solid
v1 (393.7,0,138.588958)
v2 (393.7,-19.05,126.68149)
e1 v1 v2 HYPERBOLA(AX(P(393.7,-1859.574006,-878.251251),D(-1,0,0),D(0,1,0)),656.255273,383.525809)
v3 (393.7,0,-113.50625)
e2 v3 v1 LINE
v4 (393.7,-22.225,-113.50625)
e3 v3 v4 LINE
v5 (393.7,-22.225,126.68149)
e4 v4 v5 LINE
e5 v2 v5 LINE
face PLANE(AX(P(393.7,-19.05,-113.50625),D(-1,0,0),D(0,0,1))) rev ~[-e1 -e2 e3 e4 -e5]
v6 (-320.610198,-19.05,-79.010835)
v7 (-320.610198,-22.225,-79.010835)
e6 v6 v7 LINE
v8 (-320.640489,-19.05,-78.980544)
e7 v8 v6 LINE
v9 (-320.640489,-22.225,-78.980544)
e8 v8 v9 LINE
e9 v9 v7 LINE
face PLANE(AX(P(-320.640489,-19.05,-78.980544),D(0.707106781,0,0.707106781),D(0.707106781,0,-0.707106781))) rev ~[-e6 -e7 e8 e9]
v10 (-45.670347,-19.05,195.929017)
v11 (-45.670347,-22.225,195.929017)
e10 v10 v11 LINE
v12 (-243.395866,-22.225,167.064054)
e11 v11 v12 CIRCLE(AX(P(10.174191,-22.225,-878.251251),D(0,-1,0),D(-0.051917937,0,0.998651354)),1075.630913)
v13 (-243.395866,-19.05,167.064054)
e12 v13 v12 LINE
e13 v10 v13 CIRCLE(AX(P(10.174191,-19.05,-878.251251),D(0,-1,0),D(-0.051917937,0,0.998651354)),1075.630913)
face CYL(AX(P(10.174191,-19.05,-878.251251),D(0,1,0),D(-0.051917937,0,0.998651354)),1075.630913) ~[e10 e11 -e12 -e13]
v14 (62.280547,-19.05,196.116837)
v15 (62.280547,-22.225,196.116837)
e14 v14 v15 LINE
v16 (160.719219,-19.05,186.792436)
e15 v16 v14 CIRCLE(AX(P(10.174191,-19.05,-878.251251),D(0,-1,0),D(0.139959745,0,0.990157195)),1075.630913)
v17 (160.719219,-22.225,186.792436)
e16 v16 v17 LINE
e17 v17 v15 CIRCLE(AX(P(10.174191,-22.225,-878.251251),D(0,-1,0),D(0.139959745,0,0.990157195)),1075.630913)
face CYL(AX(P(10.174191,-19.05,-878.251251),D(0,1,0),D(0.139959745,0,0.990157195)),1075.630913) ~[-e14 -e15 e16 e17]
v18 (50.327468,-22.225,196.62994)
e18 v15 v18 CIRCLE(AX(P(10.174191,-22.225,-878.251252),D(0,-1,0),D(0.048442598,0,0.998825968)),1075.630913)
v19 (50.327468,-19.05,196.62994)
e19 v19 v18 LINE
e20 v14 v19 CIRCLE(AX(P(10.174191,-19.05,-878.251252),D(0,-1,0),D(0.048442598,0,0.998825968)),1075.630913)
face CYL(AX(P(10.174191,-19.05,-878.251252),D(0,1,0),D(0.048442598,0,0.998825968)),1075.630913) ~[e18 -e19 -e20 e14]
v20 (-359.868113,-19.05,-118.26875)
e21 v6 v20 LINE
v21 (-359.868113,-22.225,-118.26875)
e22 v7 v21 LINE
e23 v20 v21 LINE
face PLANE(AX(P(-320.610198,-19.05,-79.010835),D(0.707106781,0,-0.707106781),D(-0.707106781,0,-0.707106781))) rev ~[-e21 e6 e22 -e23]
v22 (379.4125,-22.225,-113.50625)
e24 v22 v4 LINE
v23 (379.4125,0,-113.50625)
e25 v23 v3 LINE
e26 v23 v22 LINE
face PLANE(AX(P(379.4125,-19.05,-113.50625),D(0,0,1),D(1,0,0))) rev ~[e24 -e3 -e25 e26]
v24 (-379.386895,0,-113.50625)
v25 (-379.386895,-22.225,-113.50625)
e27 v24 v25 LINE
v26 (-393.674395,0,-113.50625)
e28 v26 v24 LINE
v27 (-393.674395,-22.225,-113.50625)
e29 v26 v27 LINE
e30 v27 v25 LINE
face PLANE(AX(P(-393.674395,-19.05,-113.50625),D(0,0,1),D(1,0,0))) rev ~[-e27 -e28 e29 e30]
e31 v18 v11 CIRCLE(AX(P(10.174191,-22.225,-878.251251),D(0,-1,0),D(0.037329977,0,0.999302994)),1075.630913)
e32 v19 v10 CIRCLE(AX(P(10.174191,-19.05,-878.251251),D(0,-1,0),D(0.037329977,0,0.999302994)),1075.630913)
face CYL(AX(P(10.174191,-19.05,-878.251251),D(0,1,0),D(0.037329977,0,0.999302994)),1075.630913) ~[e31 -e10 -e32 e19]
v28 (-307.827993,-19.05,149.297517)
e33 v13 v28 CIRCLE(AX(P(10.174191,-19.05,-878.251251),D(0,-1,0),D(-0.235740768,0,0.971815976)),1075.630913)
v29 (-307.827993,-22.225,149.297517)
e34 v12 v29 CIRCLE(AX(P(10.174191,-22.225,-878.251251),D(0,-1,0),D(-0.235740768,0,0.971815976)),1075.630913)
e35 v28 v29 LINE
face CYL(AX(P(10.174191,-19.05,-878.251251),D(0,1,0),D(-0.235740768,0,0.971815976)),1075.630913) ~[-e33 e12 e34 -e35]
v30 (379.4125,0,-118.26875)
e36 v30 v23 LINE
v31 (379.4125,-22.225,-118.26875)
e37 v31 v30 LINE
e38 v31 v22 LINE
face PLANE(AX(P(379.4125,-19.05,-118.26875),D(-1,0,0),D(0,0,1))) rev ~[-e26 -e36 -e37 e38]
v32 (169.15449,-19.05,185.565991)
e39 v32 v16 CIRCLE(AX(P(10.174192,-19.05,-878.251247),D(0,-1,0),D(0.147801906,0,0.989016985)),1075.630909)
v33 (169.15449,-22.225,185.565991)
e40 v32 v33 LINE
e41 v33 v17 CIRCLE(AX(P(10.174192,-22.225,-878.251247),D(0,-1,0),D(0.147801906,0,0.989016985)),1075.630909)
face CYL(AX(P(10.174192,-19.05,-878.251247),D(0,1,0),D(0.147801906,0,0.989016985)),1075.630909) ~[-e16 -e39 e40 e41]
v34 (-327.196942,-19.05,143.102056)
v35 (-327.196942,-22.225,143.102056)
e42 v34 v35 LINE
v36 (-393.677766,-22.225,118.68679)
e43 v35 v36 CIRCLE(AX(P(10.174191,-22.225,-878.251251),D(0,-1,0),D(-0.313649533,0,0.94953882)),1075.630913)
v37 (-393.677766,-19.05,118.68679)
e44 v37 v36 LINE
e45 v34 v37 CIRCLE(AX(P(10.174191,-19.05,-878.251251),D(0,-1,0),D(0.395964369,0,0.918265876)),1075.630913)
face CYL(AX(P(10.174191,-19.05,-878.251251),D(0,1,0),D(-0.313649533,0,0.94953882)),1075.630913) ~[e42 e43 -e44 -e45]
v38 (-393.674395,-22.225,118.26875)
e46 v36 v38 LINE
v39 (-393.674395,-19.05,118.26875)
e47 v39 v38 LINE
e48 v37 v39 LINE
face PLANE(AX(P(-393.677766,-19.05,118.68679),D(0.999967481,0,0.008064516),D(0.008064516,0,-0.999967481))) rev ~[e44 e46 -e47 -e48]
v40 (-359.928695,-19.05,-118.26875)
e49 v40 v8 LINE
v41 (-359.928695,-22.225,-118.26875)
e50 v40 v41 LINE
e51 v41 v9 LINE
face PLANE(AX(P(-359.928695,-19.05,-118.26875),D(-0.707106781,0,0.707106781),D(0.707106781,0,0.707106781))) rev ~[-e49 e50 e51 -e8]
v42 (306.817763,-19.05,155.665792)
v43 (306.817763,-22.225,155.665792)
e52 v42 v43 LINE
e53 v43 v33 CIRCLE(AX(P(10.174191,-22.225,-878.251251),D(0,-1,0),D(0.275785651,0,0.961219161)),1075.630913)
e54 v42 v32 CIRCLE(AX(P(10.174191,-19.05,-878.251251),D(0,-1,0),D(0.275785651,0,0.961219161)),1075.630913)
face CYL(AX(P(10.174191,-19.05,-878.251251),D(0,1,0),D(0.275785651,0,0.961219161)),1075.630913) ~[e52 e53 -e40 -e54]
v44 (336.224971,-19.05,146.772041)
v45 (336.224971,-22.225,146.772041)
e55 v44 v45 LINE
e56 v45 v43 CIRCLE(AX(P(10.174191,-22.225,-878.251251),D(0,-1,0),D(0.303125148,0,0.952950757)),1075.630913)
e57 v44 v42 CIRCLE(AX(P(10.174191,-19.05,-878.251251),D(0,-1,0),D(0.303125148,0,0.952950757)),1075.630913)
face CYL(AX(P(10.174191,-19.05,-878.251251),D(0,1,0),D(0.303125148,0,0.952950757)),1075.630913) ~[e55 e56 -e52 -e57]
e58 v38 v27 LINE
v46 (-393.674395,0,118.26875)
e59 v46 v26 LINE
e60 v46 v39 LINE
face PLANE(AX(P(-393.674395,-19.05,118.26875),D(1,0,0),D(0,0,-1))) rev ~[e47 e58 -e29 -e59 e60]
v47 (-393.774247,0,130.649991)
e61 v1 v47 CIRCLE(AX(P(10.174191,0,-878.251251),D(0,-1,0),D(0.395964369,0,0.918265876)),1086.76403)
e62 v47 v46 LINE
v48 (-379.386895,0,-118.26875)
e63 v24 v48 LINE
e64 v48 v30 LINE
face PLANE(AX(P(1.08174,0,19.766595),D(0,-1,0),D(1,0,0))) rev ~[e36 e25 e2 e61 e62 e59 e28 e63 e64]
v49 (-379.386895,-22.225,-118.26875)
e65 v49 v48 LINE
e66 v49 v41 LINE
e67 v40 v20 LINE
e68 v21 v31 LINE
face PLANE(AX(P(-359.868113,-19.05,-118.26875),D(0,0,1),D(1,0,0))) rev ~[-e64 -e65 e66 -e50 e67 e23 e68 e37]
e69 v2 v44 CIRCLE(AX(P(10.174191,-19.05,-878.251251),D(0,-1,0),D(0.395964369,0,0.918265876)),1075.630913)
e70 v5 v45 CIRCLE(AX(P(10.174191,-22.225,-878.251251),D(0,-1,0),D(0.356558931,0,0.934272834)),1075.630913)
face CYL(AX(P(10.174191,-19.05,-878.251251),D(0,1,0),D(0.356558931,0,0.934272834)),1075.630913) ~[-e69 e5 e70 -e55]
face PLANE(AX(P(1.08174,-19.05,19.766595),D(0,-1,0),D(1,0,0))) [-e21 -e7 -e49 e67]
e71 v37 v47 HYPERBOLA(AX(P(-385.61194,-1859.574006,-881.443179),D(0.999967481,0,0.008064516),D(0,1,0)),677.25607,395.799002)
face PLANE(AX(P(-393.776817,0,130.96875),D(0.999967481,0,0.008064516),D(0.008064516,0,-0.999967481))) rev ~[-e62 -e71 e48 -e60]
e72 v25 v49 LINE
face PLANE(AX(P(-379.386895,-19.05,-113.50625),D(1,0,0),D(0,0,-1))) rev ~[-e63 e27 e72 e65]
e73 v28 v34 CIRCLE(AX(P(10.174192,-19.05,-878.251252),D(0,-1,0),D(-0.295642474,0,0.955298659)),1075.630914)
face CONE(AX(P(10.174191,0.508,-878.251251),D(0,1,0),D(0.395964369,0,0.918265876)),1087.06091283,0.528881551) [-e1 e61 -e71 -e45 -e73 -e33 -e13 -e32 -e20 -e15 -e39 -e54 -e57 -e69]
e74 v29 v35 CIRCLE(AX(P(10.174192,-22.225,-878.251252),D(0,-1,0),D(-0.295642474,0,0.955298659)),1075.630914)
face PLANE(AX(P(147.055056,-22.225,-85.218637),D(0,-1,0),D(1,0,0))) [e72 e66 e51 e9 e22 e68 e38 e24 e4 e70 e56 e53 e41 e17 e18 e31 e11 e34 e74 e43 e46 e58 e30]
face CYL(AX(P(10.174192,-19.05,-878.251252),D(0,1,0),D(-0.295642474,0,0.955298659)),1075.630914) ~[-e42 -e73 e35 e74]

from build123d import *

# Parameters (mm, degrees)
F1_DEPTH    = 19.05
F2_T2_ANGLE = 47.80727079
F4_DEPTH    = 3.175


# Not quite as in the source:
# - a fillet or chamfer that OpenCascade refuses, or shapes differently, is made with other operations: its cross-section is extruded or revolved along the edge and cut away or added


with BuildPart() as f1:
    # F0 (on Front) → F1 (new body)
    with BuildSketch(Plane.XZ):
        with BuildLine():
            Line((-379.386894745, -118.26875), (379.4125, -118.26875))
            Line((379.4125, -118.26875), (379.4125, -113.50625))
            Line((379.4125, -113.50625), (393.7, -113.50625))
            Line((393.7, -113.50625), (393.7, 124.61875))
            ThreePointArc((393.7, 124.61875), (-0.5889314831, 196.0563533265), (-393.674394745, 118.26875))
            Line((-393.674394745, 118.26875), (-393.674394745, -113.50625))
            Line((-393.674394745, -113.50625), (-379.386894745, -113.50625))
            Line((-379.386894745, -113.50625), (-379.386894745, -118.26875))
        make_face()
        with BuildLine():
            ThreePointArc((-393.674394745, 118.26875), (-0.5889314831, 196.0563533265), (393.7, 124.61875))
            Line((393.7, 124.61875), (393.7, 138.90625))
            ThreePointArc((393.7, 138.90625), (-0.7824585401, 208.7544433839), (-393.7768174305, 130.96875))
            Line((-393.7768174305, 130.96875), (-393.674394745, 118.26875))
        make_face()
    extrude(amount=F1_DEPTH)

    # F2: chamfer of 19.558 x 11.43 on 1 edges, made by hand

    # F2_s1 → F2_t2 (revolve, cut)
    with BuildSketch(Plane(origin=(327.911656241, 0, -141.3984070605), x_dir=(0, 1, 0), z_dir=(0.9182658757, 0, -0.3959643691))):
        Polygon((0.508, 284.621375818), (-19.05, 273.191375818), (-19.05, 284.621375818), align=None)
    revolve(axis=Axis((10.1741912427, -19.05, -878.2512511865), (0, -1, 0)), revolution_arc=F2_T2_ANGLE, mode=Mode.SUBTRACT)

    # F3 (on face) → F4 (join)
    with BuildSketch(Plane.XZ.offset(19.05)):
        Polygon((71.1841804533, -118.26875), (178.9472539061, -118.26875), (218.205169263, -79.0108346431), (164.3236325366, -25.1292979167), (110.4420958102, -79.0108346431), align=None)
        Polygon((218.205169263, -79.0108346431), (178.9472539061, -118.26875), (257.4630846199, -118.26875), align=None)
        Polygon((393.7, -113.50625), (393.7, -38.9795184745), (379.8497794422, -25.1292979167), (325.9682427158, -79.0108346431), (286.710327359, -118.26875), (379.4125, -118.26875), (379.4125, -113.50625), align=None)
        Polygon((379.8497794422, -25.1292979167), (393.7, -38.9795184745), (393.7, -11.279077359), align=None)
        Polygon((218.205169263, -79.0108346431), (257.4630846199, -118.26875), (286.710327359, -118.26875), (325.9682427158, -79.0108346431), (272.0867059894, -25.1292979167), (218.205169263, 28.7522388097), (164.3236325366, -25.1292979167), align=None)
        Polygon((41.9369377142, -118.26875), (71.1841804533, -118.26875), (110.4420958102, -79.0108346431), (56.5605590837, -25.1292979167), (2.6790223573, 28.7522388097), (-51.2025143691, -25.1292979167), (2.6790223573, -79.0108346431), align=None)
        Polygon((-36.5788929995, -118.26875), (41.9369377142, -118.26875), (2.6790223573, -79.0108346431), align=None)
        Polygon((-144.3419664524, -118.26875), (-36.5788929995, -118.26875), (2.6790223573, -79.0108346431), (-51.2025143691, -25.1292979167), (-105.0840510955, -79.0108346431), align=None)
        Polygon((325.9682427158, -79.0108346431), (379.8497794422, -25.1292979167), (393.7, -11.279077359), (393.7, 68.7835549784), (379.8497794422, 82.6337755361), (325.9682427158, 28.7522388097), (272.0867059894, -25.1292979167), align=None)
        Polygon((110.4420958102, -79.0108346431), (164.3236325366, -25.1292979167), (218.205169263, 28.7522388097), (164.3236325366, 82.6337755361), (110.4420958102, 28.7522388097), (56.5605590837, -25.1292979167), align=None)
        Polygon((-173.5892091915, -118.26875), (-144.3419664524, -118.26875), (-105.0840510955, -79.0108346431), (-158.9655878219, -25.1292979167), (-212.8471245483, 28.7522388097), (-266.7286612747, -25.1292979167), (-212.8471245483, -79.0108346431), align=None)
        Polygon((379.8497794422, 82.6337755361), (393.7, 68.7835549784), (393.7, 96.4839960939), align=None)
        Polygon((218.205169263, 28.7522388097), (272.0867059894, -25.1292979167), (325.9682427158, 28.7522388097), (272.0867059894, 82.6337755361), (218.205169263, 136.5153122625), (164.3236325366, 82.6337755361), align=None)
        Polygon((2.6790223573, 28.7522388097), (56.5605590837, -25.1292979167), (110.4420958102, 28.7522388097), (56.5605590837, 82.6337755361), (2.6790223573, 136.5153122625), (-51.2025143691, 82.6337755361), align=None)
        Polygon((-105.0840510955, -79.0108346431), (-51.2025143691, -25.1292979167), (2.6790223573, 28.7522388097), (-51.2025143691, 82.6337755361), (-105.0840510955, 28.7522388097), (-158.9655878219, -25.1292979167), align=None)
        Polygon((-252.1050399052, -118.26875), (-173.5892091915, -118.26875), (-212.8471245483, -79.0108346431), align=None)
        Polygon((-359.868113358, -118.26875), (-252.1050399052, -118.26875), (-212.8471245483, -79.0108346431), (-266.7286612747, -25.1292979167), (-320.6101980012, -79.0108346431), align=None)
        with BuildLine():
            Line((325.9682427158, 28.7522388097), (379.8497794422, 82.6337755361))
            Line((379.8497794422, 82.6337755361), (393.7, 96.4839960939))
            Line((393.7, 96.4839960939), (393.7, 126.6814901711))
            ThreePointArc((393.7, 126.6814901711), (365.104665334, 137.1335129285), (336.2249713921, 146.7720409389))
            Line((336.2249713921, 146.7720409388), (325.9682427158, 136.5153122625))
            Line((325.9682427158, 136.5153122625), (272.0867059894, 82.6337755361))
            Line((272.0867059894, 82.6337755361), (325.9682427158, 28.7522388097))
        make_face()
        with BuildLine():
            Line((110.4420958102, 28.7522388097), (164.3236325366, 82.6337755361))
            Line((164.3236325366, 82.6337755361), (218.205169263, 136.5153122625))
            Line((218.205169263, 136.5153122625), (169.1544903585, 185.565991167))
            ThreePointArc((169.1544903585, 185.565991167), (164.9380697375, 186.1875692954), (160.7192193307, 186.792435783))
            Line((160.7192193307, 186.792435783), (110.4420958102, 136.5153122625))
            Line((110.4420958102, 136.5153122625), (56.5605590837, 82.6337755361))
            Line((56.5605590837, 82.6337755361), (110.4420958102, 28.7522388097))
        make_face()
        Polygon((-212.8471245483, 28.7522388097), (-158.9655878219, -25.1292979167), (-105.0840510955, 28.7522388097), (-158.9655878219, 82.6337755361), (-212.8471245483, 136.5153122625), (-266.7286612747, 82.6337755361), align=None)
        with BuildLine():
            Line((218.205169263, 136.5153122625), (272.0867059894, 82.6337755361))
            Line((272.0867059894, 82.6337755361), (325.9682427158, 136.5153122625))
            Line((325.9682427158, 136.5153122625), (306.8177631195, 155.6657918589))
            ThreePointArc((306.8177631195, 155.6657918589), (238.4761479453, 172.8719942997), (169.1544903585, 185.565991167))
            Line((169.1544903585, 185.565991167), (218.205169263, 136.5153122625))
        make_face()
        with BuildLine():
            Line((2.6790223573, 136.5153122625), (56.5605590838, 82.6337755361))
            Line((56.5605590837, 82.6337755361), (110.4420958102, 136.5153122625))
            Line((110.4420958102, 136.5153122625), (56.5605590837, 190.3968489889))
            Line((56.5605590837, 190.3968489889), (50.3274681554, 196.6299399173))
            ThreePointArc((50.3274681554, 196.6299399173), (2.3207372282, 197.350991232), (-45.670346508, 195.92901685))
            Line((-45.670346508, 195.92901685), (-51.2025143691, 190.3968489889))
            Line((-51.2025143691, 190.3968489889), (2.6790223573, 136.5153122625))
        make_face()
        Polygon((-105.0840510955, 28.7522388097), (-51.2025143691, 82.6337755361), (2.6790223573, 136.5153122625), (-51.2025143691, 190.3968489889), (-105.0840510955, 136.5153122625), (-158.9655878219, 82.6337755361), align=None)
        Polygon((-266.7286612747, -25.1292979167), (-212.8471245483, 28.7522388097), (-266.7286612747, 82.6337755361), (-320.6101980012, 28.7522388097), (-374.4917347276, -25.1292979167), (-320.6404889111, -78.9805437332), (-320.6101980012, -79.0108346431), align=None)
        Polygon((-379.386894745, -118.26875), (-359.9286951779, -118.26875), (-320.6404889111, -78.9805437332), (-374.4917347276, -25.1292979167), (-393.674394745, -5.9466378993), (-393.674394745, -113.50625), (-379.386894745, -113.50625), align=None)
        with BuildLine():
            Line((325.9682427158, 136.5153122625), (336.2249713921, 146.7720409388))
            ThreePointArc((336.2249713921, 146.7720409389), (321.5531223101, 151.3239145605), (306.8177631195, 155.6657918589))
            Line((306.8177631195, 155.6657918589), (325.9682427158, 136.5153122625))
        make_face()
        with BuildLine():
            Line((56.5605590837, 190.3968489889), (110.4420958102, 136.5153122625))
            Line((110.4420958102, 136.5153122625), (160.7192193307, 186.792435783))
            ThreePointArc((160.7192193307, 186.792435783), (111.6070850178, 192.5863782868), (62.2805468294, 196.1168367345))
            Line((62.2805468293, 196.1168367345), (56.5605590837, 190.3968489889))
        make_face()
        with BuildLine():
            Line((-320.6101980012, 28.7522388097), (-266.7286612747, 82.6337755361))
            Line((-266.7286612747, 82.6337755361), (-212.8471245483, 136.5153122625))
            Line((-212.8471245483, 136.5153122625), (-243.3958660177, 167.0640537319))
            ThreePointArc((-243.3958660177, 167.0640537319), (-275.7499582928, 158.6813605815), (-307.8279930641, 149.2975171996))
            Line((-307.8279930641, 149.2975171996), (-320.6101980012, 136.5153122625))
            Line((-320.6101980012, 136.5153122625), (-374.4917347276, 82.6337755361))
            Line((-374.4917347276, 82.6337755361), (-320.6101980012, 28.7522388097))
        make_face()
        with BuildLine():
            Line((-212.8471245483, 136.5153122625), (-158.9655878219, 82.6337755361))
            Line((-158.9655878219, 82.6337755361), (-105.0840510955, 136.5153122625))
            Line((-105.0840510955, 136.5153122625), (-153.4329816595, 184.8642428265))
            ThreePointArc((-153.4329816595, 184.8642428265), (-198.6042128715, 176.9233498209), (-243.3958660177, 167.0640537319))
            Line((-243.3958660177, 167.0640537319), (-212.8471245483, 136.5153122625))
        make_face()
        with BuildLine():
            Line((50.3274681554, 196.6299399173), (56.5605590837, 190.3968489889))
            Line((56.5605590837, 190.3968489889), (62.2805468293, 196.1168367345))
            ThreePointArc((62.2805468294, 196.1168367345), (56.3047208944, 196.3900074992), (50.3274681554, 196.6299399173))
        make_face()
        with BuildLine():
            Line((-105.0840510955, 136.5153122625), (-51.2025143691, 190.3968489889))
            Line((-51.2025143691, 190.3968489889), (-45.670346508, 195.92901685))
            ThreePointArc((-45.670346508, 195.92901685), (-99.6910472687, 191.75411796), (-153.4329816595, 184.8642428265))
            Line((-153.4329816595, 184.8642428265), (-105.0840510955, 136.5153122625))
        make_face()
        Polygon((-374.4917347276, -25.1292979167), (-320.6101980012, 28.7522388097), (-374.4917347276, 82.6337755361), (-393.674394745, 101.8164355535), (-393.674394745, -5.9466378993), align=None)
        with BuildLine():
            Line((-393.674394745, 101.8164355535), (-374.4917347276, 82.6337755361))
            Line((-374.4917347276, 82.6337755361), (-320.6101980012, 136.5153122625))
            Line((-320.6101980012, 136.5153122625), (-327.1969421676, 143.102056429))
            ThreePointArc((-327.1969421676, 143.102056429), (-360.6383542509, 131.4417302391), (-393.6777661416, 118.6867895926))
            Line((-393.6777661416, 118.6867895926), (-393.674394745, 118.26875))
            Line((-393.674394745, 118.26875), (-393.674394745, 101.8164355535))
        make_face()
        with BuildLine():
            Line((-320.6101980012, 136.5153122625), (-307.8279930641, 149.2975171996))
            ThreePointArc((-307.8279930641, 149.2975171996), (-317.5271092238, 146.2455610624), (-327.1969421676, 143.102056429))
            Line((-327.1969421676, 143.102056429), (-320.6101980012, 136.5153122625))
        make_face()
    extrude(amount=F4_DEPTH)


solid = f1.part
